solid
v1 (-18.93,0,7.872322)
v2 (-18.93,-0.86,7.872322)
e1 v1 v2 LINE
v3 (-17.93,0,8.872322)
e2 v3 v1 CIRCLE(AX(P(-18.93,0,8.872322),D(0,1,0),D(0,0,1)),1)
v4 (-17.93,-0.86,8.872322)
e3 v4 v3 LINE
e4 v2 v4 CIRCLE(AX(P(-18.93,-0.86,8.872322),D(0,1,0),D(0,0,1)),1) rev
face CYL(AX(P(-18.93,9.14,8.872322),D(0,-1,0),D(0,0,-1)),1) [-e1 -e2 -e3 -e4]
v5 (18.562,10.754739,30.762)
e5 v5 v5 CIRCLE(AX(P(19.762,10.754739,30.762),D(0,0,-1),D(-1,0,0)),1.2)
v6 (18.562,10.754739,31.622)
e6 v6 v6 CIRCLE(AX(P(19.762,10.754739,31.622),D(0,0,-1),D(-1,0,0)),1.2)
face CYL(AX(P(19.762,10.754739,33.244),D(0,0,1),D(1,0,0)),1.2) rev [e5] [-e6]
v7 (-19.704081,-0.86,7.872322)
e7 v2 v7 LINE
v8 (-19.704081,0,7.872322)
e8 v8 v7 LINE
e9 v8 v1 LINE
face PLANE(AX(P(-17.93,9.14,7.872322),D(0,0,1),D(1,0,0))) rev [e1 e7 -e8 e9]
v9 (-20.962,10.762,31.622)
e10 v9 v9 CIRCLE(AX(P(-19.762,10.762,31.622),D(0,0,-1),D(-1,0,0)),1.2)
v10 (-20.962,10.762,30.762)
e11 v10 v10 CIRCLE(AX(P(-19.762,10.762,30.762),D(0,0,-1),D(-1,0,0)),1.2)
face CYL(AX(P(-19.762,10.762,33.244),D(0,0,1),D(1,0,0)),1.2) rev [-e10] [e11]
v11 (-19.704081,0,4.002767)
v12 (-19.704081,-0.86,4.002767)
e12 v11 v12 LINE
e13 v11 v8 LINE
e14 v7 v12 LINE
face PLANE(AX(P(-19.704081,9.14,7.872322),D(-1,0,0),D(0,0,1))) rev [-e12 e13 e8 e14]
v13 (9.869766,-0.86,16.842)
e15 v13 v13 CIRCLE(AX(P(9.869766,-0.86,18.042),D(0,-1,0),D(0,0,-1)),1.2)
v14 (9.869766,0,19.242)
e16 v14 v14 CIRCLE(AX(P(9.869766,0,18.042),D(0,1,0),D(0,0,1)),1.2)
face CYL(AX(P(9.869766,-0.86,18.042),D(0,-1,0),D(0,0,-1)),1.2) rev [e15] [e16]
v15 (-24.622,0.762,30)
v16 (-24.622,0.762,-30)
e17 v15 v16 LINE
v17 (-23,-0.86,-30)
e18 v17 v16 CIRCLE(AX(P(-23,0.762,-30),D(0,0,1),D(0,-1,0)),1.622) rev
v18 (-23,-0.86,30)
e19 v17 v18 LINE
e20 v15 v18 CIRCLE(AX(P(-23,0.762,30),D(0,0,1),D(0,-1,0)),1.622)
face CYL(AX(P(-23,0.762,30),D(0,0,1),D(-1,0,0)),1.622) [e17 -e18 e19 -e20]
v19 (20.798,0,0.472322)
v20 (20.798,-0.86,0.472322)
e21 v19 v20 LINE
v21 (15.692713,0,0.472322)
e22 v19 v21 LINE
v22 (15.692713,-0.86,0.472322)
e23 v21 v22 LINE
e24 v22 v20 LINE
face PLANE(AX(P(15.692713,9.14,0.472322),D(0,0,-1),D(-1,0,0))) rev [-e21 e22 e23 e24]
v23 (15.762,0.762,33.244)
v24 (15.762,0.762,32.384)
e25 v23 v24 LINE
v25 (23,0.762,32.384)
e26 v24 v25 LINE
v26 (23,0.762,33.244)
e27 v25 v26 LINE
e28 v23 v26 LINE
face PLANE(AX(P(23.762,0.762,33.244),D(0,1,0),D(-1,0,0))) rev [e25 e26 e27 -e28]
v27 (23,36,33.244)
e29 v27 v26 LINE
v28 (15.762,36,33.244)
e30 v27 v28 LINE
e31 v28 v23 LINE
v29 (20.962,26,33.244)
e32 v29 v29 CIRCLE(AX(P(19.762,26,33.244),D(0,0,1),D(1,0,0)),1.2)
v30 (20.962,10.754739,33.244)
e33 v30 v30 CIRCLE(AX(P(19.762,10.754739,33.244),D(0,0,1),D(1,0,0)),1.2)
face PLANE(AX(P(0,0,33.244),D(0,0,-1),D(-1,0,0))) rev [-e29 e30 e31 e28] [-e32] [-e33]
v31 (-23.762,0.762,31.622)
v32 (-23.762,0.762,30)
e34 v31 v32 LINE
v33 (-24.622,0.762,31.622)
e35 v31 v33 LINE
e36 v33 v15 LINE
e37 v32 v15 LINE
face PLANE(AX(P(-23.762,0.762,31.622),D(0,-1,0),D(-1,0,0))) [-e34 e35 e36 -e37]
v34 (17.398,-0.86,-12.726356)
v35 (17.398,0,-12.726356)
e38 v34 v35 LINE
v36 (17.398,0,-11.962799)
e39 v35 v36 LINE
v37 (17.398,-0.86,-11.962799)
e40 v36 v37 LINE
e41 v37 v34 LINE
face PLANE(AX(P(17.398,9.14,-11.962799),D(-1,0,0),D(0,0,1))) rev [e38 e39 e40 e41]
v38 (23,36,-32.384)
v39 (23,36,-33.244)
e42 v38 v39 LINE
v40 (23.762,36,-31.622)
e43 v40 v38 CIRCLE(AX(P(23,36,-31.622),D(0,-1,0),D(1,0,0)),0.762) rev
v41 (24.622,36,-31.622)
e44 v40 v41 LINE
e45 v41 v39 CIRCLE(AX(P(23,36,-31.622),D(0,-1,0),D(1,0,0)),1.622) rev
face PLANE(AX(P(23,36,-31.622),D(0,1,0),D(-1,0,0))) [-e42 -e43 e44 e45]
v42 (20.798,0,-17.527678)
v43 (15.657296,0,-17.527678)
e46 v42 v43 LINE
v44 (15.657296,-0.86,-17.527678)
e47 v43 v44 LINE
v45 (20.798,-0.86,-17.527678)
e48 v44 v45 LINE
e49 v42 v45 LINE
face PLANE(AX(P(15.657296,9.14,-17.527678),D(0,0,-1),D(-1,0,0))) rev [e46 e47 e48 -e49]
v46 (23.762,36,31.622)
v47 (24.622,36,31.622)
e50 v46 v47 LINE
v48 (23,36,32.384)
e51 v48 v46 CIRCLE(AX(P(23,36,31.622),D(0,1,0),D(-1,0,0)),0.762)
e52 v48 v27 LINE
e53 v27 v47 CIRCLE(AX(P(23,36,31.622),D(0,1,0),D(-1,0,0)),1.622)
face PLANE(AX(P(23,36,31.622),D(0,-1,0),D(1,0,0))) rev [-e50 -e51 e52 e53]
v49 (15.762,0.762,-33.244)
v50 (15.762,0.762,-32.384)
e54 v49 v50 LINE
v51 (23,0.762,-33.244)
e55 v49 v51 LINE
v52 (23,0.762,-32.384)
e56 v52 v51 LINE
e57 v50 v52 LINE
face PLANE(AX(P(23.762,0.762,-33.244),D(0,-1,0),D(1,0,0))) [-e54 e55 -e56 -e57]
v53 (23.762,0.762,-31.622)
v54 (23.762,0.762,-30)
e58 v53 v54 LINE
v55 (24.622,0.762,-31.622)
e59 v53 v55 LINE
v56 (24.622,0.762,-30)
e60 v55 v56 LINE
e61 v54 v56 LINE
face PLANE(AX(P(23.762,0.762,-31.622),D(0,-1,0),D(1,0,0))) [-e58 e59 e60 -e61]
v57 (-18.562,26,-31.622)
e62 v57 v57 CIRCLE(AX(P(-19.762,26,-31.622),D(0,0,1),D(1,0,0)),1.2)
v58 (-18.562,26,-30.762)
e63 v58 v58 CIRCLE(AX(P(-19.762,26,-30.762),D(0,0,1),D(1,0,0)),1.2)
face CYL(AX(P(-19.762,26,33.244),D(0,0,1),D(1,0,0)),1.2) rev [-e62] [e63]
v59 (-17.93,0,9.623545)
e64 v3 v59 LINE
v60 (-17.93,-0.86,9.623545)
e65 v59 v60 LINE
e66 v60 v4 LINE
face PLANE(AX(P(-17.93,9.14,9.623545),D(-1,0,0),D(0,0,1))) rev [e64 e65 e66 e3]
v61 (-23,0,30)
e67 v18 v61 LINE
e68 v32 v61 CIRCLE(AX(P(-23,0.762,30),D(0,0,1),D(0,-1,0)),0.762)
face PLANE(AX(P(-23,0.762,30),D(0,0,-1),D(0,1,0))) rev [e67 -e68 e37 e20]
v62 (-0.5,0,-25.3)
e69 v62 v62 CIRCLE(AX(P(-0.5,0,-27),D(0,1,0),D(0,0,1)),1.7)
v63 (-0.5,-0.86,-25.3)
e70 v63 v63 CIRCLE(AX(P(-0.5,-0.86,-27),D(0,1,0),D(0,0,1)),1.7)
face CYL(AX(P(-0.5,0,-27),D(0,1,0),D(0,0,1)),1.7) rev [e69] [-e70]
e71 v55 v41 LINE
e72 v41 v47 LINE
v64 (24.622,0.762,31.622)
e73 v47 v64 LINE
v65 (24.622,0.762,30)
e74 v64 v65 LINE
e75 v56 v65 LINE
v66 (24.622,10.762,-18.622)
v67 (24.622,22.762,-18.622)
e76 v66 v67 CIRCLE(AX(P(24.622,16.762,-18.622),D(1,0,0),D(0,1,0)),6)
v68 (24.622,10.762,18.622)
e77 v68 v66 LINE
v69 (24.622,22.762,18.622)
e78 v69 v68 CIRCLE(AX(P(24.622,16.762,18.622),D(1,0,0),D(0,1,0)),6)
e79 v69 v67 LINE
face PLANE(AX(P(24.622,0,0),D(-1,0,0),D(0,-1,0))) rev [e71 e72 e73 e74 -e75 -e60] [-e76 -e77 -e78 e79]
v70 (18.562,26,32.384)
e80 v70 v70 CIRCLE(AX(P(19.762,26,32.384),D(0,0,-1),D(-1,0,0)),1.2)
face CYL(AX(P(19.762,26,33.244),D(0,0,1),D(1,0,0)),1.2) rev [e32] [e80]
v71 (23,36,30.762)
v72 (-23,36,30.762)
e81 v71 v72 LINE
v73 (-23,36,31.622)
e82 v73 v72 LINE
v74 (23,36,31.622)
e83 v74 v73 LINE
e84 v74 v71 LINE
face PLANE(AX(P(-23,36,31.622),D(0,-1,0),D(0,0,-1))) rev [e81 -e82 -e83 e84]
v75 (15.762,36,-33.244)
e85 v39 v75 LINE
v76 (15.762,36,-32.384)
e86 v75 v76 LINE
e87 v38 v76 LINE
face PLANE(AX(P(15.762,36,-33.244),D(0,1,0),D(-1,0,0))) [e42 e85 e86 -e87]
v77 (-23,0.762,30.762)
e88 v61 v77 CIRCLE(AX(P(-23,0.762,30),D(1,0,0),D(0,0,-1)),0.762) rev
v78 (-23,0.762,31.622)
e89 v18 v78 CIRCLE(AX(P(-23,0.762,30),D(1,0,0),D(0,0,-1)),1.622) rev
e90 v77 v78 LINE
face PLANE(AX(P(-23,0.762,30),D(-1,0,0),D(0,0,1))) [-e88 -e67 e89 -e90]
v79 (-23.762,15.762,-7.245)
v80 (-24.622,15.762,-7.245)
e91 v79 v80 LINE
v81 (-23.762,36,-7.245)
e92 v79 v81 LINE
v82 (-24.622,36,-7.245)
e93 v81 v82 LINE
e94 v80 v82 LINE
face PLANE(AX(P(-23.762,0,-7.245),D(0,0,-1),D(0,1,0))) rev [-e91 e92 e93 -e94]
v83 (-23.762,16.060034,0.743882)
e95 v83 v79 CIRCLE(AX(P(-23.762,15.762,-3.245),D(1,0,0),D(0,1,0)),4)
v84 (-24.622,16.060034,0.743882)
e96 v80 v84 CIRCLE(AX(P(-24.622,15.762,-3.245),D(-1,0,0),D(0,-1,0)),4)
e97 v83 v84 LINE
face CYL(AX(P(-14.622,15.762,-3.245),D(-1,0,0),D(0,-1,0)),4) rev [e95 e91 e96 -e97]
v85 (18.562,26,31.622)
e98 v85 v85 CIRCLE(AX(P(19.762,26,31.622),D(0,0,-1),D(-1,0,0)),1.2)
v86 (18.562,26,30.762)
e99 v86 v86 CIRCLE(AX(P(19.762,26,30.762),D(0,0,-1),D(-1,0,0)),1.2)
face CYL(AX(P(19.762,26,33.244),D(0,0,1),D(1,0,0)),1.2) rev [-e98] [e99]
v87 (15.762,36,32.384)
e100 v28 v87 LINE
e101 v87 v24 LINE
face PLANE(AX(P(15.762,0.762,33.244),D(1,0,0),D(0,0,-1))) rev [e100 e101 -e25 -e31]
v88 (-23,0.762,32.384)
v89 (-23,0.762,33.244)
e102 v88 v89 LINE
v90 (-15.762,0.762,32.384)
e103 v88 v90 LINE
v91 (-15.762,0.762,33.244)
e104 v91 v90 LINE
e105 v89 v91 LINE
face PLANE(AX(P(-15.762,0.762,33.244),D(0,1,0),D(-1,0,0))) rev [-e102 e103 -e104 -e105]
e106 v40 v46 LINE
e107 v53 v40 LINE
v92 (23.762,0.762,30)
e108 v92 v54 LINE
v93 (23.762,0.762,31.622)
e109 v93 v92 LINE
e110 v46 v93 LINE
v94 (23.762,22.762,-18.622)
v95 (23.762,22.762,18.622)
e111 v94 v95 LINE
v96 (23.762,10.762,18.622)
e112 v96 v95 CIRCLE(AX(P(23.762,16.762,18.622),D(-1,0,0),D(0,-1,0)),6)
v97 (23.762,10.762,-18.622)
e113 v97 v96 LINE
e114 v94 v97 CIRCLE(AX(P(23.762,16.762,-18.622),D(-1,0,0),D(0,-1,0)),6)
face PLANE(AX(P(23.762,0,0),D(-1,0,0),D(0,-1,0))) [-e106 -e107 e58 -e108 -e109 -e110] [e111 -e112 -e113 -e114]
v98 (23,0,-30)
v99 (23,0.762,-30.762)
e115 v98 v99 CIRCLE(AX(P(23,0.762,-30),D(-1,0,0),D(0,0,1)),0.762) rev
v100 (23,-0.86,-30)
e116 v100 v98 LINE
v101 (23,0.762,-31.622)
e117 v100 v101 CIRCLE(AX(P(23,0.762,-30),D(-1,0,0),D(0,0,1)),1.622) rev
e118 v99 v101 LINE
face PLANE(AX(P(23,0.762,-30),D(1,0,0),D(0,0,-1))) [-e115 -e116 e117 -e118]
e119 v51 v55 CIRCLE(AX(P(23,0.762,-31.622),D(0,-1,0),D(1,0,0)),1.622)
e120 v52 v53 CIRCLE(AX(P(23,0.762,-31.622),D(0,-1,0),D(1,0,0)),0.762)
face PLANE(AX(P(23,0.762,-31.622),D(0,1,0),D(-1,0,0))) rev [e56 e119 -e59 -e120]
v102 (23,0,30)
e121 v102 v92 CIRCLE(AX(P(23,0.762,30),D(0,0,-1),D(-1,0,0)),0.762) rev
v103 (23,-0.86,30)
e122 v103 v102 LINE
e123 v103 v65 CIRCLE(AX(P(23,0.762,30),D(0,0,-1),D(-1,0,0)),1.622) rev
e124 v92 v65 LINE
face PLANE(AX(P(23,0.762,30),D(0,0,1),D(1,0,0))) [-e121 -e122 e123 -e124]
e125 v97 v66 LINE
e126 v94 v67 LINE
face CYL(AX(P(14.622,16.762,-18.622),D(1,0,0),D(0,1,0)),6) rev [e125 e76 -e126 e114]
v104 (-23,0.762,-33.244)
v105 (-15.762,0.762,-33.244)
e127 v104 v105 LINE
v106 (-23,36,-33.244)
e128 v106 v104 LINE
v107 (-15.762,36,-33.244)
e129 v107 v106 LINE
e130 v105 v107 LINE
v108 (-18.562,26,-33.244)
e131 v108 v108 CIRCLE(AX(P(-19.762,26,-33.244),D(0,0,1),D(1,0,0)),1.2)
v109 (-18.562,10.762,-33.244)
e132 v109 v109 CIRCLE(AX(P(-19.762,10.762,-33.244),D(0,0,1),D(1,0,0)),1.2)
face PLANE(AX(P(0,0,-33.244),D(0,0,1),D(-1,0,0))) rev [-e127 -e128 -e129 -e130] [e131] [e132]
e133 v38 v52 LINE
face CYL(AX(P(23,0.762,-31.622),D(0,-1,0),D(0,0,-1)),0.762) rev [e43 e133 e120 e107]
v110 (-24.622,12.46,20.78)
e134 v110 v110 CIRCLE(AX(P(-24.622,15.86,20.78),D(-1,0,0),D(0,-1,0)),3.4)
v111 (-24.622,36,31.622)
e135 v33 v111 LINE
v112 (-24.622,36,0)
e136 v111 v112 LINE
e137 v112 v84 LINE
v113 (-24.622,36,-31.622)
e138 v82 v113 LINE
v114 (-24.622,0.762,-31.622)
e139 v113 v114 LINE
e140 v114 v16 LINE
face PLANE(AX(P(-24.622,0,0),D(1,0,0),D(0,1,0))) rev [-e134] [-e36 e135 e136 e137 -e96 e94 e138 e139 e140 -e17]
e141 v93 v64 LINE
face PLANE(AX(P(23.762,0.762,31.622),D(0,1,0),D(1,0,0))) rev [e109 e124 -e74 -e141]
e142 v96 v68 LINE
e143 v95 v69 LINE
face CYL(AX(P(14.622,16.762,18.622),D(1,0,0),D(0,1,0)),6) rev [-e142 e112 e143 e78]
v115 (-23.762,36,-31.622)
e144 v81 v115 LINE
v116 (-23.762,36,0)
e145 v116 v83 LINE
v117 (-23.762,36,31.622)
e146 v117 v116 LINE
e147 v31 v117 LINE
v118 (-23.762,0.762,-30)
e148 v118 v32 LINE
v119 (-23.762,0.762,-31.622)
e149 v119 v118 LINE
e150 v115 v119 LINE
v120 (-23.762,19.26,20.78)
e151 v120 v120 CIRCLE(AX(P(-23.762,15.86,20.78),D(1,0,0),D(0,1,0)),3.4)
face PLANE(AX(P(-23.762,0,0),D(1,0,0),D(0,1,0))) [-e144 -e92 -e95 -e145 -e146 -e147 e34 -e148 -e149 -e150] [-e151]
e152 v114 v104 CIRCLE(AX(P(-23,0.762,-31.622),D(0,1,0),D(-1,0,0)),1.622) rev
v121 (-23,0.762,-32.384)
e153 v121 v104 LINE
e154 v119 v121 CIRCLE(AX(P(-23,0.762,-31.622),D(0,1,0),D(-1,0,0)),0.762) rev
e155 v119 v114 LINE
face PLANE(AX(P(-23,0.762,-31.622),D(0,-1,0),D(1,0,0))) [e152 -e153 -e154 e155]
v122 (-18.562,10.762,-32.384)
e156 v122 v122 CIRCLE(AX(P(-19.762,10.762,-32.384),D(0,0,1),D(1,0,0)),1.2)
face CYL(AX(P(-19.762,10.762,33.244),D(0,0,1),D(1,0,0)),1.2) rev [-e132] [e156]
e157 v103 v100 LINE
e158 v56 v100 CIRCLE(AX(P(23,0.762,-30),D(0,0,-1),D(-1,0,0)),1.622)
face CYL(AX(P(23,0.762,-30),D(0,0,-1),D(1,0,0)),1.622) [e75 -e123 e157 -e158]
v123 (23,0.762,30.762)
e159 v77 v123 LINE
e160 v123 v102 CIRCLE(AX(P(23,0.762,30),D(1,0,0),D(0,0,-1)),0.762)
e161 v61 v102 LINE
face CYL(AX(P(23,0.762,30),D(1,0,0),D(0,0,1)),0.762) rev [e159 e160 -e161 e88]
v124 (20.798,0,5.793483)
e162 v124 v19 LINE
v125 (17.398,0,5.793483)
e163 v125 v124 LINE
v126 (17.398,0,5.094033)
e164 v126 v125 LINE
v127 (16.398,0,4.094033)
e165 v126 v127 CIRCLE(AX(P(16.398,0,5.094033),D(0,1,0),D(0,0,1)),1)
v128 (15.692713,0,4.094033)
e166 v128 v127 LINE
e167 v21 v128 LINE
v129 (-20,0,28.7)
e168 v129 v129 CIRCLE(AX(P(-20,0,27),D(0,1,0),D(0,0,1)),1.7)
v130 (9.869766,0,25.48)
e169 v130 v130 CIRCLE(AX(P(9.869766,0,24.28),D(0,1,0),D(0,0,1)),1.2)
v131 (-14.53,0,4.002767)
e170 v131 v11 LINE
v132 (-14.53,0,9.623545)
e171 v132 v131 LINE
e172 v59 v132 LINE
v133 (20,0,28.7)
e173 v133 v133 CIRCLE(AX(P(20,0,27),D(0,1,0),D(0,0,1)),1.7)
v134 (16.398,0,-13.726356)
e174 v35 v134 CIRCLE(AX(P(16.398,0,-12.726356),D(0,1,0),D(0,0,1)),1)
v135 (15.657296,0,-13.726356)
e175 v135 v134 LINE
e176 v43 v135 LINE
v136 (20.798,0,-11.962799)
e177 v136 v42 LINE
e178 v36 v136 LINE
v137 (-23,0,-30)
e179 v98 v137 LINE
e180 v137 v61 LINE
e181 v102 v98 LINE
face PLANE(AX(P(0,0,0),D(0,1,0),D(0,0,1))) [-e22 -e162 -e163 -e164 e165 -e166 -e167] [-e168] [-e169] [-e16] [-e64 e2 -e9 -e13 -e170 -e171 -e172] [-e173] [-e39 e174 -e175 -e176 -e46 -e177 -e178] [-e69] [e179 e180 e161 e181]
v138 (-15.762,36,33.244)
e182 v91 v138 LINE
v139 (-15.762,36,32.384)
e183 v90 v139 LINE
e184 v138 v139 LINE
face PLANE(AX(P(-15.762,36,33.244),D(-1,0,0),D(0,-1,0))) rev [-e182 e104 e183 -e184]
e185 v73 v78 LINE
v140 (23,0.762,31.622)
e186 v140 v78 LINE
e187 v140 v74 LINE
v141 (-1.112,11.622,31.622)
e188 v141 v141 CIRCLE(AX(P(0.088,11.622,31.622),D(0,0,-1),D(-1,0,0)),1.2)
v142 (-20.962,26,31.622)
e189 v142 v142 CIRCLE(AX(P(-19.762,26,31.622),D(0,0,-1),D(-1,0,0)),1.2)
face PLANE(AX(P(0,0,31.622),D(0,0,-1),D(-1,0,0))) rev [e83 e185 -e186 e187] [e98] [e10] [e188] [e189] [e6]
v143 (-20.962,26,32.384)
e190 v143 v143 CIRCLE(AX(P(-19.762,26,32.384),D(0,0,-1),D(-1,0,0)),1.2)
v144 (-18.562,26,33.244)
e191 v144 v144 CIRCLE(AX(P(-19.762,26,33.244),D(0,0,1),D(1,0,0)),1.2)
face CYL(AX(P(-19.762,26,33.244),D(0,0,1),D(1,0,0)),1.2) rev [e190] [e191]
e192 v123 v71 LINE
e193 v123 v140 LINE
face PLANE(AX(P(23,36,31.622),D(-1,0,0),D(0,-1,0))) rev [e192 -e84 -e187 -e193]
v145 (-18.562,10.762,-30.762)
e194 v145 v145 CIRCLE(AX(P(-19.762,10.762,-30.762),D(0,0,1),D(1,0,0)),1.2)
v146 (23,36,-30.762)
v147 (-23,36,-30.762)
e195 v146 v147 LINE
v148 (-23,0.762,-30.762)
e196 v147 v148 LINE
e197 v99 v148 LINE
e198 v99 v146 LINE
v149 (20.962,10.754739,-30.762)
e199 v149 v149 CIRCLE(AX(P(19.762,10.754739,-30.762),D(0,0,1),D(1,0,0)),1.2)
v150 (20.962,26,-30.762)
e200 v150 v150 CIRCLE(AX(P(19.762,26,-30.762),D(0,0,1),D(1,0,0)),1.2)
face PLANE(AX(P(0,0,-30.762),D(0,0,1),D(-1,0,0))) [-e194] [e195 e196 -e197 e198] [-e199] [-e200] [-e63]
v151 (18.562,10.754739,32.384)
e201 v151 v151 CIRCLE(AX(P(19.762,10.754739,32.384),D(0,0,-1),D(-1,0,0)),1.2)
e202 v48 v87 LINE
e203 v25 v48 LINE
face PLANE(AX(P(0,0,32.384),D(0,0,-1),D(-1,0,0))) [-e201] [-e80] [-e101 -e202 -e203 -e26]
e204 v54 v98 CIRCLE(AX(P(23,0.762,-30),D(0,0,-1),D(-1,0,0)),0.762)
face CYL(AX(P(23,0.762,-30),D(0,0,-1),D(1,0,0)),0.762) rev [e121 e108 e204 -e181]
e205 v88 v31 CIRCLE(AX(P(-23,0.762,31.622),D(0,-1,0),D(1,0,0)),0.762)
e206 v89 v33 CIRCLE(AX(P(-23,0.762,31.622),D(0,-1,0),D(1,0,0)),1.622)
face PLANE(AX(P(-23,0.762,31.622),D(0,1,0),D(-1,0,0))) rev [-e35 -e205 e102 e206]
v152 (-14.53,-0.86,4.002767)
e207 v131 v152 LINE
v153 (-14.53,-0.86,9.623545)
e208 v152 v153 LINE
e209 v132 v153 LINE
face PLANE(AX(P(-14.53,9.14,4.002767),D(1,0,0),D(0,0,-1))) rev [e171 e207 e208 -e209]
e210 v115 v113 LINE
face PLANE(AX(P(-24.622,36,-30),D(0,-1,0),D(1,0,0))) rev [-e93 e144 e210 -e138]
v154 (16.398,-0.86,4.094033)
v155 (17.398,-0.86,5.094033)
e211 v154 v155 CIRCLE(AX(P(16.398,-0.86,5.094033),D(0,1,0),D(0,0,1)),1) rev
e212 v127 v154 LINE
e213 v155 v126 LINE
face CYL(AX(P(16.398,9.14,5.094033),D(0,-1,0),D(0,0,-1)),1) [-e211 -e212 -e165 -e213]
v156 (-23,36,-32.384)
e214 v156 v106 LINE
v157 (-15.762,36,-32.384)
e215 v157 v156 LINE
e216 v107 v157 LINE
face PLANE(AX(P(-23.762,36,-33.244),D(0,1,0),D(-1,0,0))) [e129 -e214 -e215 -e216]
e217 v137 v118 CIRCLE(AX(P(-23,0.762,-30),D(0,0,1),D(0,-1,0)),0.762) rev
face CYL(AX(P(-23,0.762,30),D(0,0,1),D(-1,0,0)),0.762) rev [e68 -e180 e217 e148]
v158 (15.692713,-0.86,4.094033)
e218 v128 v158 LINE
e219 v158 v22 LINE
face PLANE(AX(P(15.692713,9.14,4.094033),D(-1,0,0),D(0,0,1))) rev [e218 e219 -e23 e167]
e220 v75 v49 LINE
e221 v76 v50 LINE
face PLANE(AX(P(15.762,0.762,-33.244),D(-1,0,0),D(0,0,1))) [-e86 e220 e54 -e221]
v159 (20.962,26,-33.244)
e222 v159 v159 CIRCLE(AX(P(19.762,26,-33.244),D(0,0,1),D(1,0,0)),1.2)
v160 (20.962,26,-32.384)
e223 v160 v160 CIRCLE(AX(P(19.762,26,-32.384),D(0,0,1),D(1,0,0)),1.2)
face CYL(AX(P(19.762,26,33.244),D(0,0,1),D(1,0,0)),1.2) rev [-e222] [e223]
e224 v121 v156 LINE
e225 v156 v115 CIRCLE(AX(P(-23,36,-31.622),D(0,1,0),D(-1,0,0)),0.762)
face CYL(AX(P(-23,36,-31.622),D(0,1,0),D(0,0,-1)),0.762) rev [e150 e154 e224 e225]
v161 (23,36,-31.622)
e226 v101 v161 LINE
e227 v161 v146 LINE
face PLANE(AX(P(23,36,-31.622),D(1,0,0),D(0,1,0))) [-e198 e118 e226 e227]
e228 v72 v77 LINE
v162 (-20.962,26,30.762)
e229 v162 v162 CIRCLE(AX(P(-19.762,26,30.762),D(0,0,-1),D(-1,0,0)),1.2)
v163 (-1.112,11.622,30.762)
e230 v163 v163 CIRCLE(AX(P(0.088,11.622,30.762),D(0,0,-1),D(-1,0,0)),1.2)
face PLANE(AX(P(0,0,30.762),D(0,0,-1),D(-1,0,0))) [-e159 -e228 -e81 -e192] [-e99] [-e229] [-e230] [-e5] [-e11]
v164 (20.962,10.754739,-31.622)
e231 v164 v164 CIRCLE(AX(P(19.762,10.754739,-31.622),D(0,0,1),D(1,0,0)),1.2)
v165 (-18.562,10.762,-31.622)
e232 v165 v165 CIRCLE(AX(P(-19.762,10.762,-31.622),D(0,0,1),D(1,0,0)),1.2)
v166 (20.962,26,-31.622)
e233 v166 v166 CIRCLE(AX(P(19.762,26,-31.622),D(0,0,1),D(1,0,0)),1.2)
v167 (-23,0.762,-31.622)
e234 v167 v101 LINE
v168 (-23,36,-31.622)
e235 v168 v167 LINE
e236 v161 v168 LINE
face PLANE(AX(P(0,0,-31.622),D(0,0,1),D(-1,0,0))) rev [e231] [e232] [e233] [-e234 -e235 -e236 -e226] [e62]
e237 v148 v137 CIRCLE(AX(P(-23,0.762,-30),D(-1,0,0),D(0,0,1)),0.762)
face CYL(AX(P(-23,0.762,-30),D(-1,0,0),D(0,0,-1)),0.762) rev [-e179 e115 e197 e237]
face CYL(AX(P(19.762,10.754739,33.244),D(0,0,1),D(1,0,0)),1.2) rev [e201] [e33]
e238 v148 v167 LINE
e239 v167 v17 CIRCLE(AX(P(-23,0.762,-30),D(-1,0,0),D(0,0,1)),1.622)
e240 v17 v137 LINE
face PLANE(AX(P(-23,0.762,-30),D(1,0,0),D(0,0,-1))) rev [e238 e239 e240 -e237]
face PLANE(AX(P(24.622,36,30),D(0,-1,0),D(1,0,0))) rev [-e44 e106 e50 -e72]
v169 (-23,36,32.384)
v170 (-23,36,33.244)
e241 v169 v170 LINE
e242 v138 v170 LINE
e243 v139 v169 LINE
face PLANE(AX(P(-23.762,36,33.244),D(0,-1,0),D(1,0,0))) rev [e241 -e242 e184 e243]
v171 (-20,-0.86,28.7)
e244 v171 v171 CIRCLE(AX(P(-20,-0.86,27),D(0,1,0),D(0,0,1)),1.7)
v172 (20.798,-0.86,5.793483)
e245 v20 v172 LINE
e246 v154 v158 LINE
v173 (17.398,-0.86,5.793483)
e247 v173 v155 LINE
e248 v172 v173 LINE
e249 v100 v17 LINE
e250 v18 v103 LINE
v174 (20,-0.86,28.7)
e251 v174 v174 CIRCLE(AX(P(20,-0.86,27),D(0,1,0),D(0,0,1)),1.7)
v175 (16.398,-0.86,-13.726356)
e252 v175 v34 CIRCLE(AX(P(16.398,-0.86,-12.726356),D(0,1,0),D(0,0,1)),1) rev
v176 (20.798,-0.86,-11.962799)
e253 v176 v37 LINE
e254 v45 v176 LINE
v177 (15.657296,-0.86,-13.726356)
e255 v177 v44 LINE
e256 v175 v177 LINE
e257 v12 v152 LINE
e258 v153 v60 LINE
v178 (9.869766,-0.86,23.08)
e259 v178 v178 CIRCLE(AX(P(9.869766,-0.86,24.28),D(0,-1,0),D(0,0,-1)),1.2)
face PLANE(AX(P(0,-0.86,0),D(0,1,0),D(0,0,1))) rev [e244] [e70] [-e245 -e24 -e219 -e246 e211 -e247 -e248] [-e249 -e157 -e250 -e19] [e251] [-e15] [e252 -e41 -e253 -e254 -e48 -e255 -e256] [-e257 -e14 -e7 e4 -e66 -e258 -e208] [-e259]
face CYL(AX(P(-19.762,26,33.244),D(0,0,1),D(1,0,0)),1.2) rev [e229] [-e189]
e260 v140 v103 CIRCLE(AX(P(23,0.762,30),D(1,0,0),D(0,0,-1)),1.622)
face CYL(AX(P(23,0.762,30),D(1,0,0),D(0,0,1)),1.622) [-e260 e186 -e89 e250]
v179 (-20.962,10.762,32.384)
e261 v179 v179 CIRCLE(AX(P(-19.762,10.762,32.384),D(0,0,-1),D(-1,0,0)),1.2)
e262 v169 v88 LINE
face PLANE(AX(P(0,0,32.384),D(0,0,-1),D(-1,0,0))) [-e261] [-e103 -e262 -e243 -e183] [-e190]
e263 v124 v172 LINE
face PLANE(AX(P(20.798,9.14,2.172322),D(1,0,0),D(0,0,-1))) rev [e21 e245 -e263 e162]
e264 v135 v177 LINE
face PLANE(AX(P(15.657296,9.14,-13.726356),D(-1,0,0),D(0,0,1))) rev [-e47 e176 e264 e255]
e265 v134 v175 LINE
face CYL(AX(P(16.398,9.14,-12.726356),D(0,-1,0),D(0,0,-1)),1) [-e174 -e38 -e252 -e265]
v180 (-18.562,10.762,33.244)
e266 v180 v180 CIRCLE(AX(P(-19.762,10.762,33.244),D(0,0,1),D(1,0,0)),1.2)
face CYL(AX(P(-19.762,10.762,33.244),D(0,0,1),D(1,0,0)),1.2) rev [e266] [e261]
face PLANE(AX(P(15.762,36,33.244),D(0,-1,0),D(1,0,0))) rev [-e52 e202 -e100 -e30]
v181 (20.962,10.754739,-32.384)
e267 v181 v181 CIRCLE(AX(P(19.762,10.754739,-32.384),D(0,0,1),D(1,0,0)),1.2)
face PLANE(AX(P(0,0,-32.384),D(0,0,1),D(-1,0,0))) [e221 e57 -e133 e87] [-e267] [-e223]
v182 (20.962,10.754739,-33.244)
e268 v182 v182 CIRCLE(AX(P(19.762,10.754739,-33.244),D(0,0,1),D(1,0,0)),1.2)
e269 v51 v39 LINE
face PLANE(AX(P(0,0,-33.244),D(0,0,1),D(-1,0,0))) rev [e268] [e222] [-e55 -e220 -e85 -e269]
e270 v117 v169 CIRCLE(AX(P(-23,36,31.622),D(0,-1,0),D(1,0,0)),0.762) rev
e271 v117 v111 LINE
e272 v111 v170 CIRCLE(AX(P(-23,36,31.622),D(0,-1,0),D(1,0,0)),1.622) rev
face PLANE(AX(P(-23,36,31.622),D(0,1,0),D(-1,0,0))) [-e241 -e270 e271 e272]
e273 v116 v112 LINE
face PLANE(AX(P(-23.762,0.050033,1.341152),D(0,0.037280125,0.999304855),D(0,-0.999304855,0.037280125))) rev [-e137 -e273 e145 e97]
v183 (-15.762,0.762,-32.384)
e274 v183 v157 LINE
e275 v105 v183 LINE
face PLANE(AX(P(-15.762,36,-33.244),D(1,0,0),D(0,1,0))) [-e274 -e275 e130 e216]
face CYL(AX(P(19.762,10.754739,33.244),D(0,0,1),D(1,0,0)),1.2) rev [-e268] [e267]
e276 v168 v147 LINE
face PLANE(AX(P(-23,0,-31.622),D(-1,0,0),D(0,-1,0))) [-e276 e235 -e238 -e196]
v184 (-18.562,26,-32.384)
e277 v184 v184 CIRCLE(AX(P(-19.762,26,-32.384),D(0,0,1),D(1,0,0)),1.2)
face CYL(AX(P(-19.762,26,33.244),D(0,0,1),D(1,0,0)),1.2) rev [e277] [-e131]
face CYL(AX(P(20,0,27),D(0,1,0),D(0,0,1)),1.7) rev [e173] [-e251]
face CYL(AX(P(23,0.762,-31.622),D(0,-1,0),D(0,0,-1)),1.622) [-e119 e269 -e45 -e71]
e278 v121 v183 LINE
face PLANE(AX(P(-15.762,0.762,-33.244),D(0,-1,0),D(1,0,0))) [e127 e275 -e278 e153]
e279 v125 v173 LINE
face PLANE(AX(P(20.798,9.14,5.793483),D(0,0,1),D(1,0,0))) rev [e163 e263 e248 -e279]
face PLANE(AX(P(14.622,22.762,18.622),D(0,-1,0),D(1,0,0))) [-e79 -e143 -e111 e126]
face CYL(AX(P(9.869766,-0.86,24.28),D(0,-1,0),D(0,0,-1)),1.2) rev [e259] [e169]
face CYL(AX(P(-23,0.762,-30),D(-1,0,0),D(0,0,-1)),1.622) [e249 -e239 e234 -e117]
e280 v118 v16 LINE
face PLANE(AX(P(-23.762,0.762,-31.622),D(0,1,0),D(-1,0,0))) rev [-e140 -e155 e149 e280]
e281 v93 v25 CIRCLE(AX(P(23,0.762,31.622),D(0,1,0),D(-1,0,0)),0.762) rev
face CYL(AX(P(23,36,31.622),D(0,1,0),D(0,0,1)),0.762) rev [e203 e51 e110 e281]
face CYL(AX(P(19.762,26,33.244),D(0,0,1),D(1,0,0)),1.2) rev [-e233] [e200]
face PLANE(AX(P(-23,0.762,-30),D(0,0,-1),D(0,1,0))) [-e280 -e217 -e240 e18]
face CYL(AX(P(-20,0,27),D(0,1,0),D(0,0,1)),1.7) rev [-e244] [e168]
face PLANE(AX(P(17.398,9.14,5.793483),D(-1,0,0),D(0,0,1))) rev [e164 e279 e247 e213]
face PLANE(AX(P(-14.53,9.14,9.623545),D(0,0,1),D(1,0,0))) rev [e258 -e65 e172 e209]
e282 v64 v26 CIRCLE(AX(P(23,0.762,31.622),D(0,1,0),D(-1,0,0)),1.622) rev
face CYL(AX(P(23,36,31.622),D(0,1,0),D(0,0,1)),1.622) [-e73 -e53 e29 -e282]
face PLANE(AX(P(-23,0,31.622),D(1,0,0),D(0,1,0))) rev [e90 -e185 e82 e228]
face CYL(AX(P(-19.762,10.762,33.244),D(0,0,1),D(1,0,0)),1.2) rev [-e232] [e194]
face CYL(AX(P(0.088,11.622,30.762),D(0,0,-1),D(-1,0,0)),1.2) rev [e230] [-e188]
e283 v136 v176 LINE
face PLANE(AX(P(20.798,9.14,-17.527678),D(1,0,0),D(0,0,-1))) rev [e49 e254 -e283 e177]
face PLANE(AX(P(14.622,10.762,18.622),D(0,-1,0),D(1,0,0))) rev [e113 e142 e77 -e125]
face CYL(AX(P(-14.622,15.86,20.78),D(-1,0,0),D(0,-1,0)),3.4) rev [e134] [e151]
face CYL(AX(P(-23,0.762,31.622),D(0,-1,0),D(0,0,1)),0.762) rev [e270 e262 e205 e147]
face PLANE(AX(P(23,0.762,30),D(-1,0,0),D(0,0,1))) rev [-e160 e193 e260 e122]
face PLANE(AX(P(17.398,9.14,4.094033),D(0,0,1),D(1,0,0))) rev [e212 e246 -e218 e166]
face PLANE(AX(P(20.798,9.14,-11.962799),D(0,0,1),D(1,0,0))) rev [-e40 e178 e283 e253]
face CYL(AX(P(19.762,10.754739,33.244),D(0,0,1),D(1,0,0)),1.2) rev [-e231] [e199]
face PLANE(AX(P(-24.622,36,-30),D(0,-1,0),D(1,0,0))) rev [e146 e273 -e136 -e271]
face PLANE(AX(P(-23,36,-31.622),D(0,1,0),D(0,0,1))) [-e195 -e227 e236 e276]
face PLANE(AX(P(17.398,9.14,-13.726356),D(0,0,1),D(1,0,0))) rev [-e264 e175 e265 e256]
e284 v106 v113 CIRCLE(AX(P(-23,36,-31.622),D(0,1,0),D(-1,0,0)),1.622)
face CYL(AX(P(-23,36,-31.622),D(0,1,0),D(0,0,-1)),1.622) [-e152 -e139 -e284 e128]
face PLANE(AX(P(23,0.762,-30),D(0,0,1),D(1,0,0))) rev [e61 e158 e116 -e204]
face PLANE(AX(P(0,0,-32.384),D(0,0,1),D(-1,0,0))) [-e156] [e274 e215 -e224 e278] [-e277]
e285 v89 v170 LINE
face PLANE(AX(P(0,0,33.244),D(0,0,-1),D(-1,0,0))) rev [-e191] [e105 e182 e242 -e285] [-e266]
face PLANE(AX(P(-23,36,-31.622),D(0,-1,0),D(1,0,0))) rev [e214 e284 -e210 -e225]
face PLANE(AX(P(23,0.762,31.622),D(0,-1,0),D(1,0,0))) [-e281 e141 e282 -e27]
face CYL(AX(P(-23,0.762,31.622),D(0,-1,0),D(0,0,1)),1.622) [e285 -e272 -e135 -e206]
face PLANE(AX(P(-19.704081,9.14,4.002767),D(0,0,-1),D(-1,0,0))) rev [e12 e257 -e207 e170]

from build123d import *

# Parameters (mm, degrees)
SKETCH2_W                = 46
SKETCH2_H                = 60
BASE_FLANGE1_DEPTH       = 0.86
EDGE_FLANGE1_DEPTH       = 60
EDGE_FLANGE2_DEPTH       = 46
EDGE_FLANGE3_DEPTH       = 60
EDGE_FLANGE5_START       = 0.762
EDGE_FLANGE5_DEPTH       = 35.238
EDGE_FLANGE6_START       = 0.762
EDGE_FLANGE6_DEPTH       = 35.238
M3_CLEARANCE_HOLE1_D     = 3.4
M3_CLEARANCE_HOLE1_DEPTH = 12
M3_CLEARANCE_HOLE1_TIP   = 1.021463052
SKETCH28_R               = 3.4
CUT_EXTRUDE1_DEPTH       = 10
SKETCH29_R               = 4
CUT_EXTRUDE2_DEPTH       = 10
M2_CLEARANCE_HOLE1_D     = 2.4
M2_CLEARANCE_HOLE1_DEPTH = 12
M2_CLEARANCE_HOLE1_TIP   = 0.721032743
M3_CLEARANCE_HOLE2_D     = 3.4
M3_CLEARANCE_HOLE2_DEPTH = 12
M3_CLEARANCE_HOLE2_TIP   = 1.021463052
M2_CLEARANCE_HOLE2_D     = 2.4
M2_CLEARANCE_HOLE4_D     = 2.4
M2_CLEARANCE_HOLE4_DEPTH = 12
M2_CLEARANCE_HOLE4_TIP   = 0.721032743
CUT_EXTRUDE3_DEPTH       = 10
CUT_EXTRUDE4_DEPTH       = 10
CUT_EXTRUDE5_DEPTH       = 10
CUT_EXTRUDE6_DEPTH       = 10
FILLET1_R                = 1
CUT_EXTRUDE7_DEPTH       = 10


# Read off the part's stored shape, not the designer's step: Edge-Flange5, Edge-Flange6
# Sheet-metal steps are written as plain solids
with BuildPart() as part:
    # Sketch2 → Base-Flange1 (new body)
    with BuildSketch(Plane(origin=(0, 0, 0), x_dir=(1, 0, 0), z_dir=(0, 1, 0))):
        Rectangle(SKETCH2_W, SKETCH2_H)
    extrude(amount=-BASE_FLANGE1_DEPTH)

    # Edge-Flange1 section (across the edge) → Edge-Flange1 (add)
    with BuildSketch(Plane(origin=(-23.762, 0, -30), x_dir=(1, 0, 0), z_dir=(0, 0, 1))):
        with BuildLine():
            Line((-0.86, 0.762), (-0.86, 36))
            Line((-0.86, 36), (0, 36))
            Line((0, 36), (0, 0.762))
            ThreePointArc((0, 0.762), (0.223184633, 0.223184633), (0.762, 0))
            Line((0.762, 0), (0.762, -0.86))
            ThreePointArc((0.762, -0.86), (-0.384927199, -0.384927199), (-0.86, 0.762))
        make_face()
    extrude(amount=EDGE_FLANGE1_DEPTH)

    # Edge-Flange2 section (across the edge) → Edge-Flange2 (add)
    with BuildSketch(Plane(origin=(-23, 0, 30.762), x_dir=(0, 0, -1), z_dir=(1, 0, 0))):
        with BuildLine():
            Line((-0.86, 0.762), (-0.86, 36))
            Line((-0.86, 36), (0, 36))
            Line((0, 36), (0, 0.762))
            ThreePointArc((0, 0.762), (0.223184633, 0.223184633), (0.762, 0))
            Line((0.762, 0), (0.762, -0.86))
            ThreePointArc((0.762, -0.86), (-0.384927199, -0.384927199), (-0.86, 0.762))
        make_face()
    edge_flange2 = extrude(amount=EDGE_FLANGE2_DEPTH)

    # Mirror1: Edge-Flange2 across plane
    add(edge_flange2.mirror(Plane.XY))

    # Edge-Flange3 section (across the edge) → Edge-Flange3 (add)
    with BuildSketch(Plane(origin=(23.762, 0, 30), x_dir=(-1, 0, 0), z_dir=(0, 0, -1))):
        with BuildLine():
            Line((-0.86, 0.762), (-0.86, 36))
            Line((-0.86, 36), (0, 36))
            Line((0, 36), (0, 0.762))
            ThreePointArc((0, 0.762), (0.223184633, 0.223184633), (0.762, 0))
            Line((0.762, 0), (0.762, -0.86))
            ThreePointArc((0.762, -0.86), (-0.384927199, -0.384927199), (-0.86, 0.762))
        make_face()
    extrude(amount=EDGE_FLANGE3_DEPTH)

    # Edge-Flange5 outline → Edge-Flange5 (add)
    with BuildSketch(Plane(origin=(0, 0, 0), x_dir=(1, 0, 0), z_dir=(0, 1, 0)).offset(EDGE_FLANGE5_START)):
        with BuildLine():
            ThreePointArc((-24.622, -31.622), (-24.146927199, -32.768927199), (-23, -33.244))
            Line((-23, -33.244), (-15.762, -33.244))
            Line((-15.762, -33.244), (-15.762, -32.384))
            Line((-15.762, -32.384), (-23, -32.384))
            ThreePointArc((-23, -32.384), (-23.538815367, -32.160815367), (-23.762, -31.622))
            Line((-23.762, -31.622), (-23.762, -30))
            Line((-23.762, -30), (-24.622, -30))
            Line((-24.622, -30), (-24.622, -31.622))
        make_face()
    edge_flange5 = extrude(amount=EDGE_FLANGE5_DEPTH)

    # Mirror2: Edge-Flange5 across plane
    add(edge_flange5.mirror(Plane.XY))

    # Edge-Flange6 outline → Edge-Flange6 (add)
    with BuildSketch(Plane(origin=(0, 0, 0), x_dir=(1, 0, 0), z_dir=(0, 1, 0)).offset(EDGE_FLANGE6_START)):
        with BuildLine():
            Line((15.762, -33.244), (23, -33.244))
            ThreePointArc((23, -33.244), (24.146927199, -32.768927199), (24.622, -31.622))
            Line((24.622, -31.622), (24.622, -30))
            Line((24.622, -30), (23.762, -30))
            Line((23.762, -30), (23.762, -31.622))
            ThreePointArc((23.762, -31.622), (23.538815367, -32.160815367), (23, -32.384))
            Line((23, -32.384), (15.762, -32.384))
            Line((15.762, -32.384), (15.762, -33.244))
        make_face()
    edge_flange6 = extrude(amount=EDGE_FLANGE6_DEPTH)

    # Mirror3: Edge-Flange6 across plane
    add(edge_flange6.mirror(Plane.XY))

    # M3 Clearance Hole1
    with Locations(Plane(origin=(0, 0, 0), x_dir=(1, 0, 0), z_dir=(0, 1, 0))):
        with Locations((-20, -27), (20, -27), (-0.5, 27)):
            Hole(M3_CLEARANCE_HOLE1_D / 2, depth=M3_CLEARANCE_HOLE1_DEPTH)
            with Locations((0, 0, -(M3_CLEARANCE_HOLE1_DEPTH + M3_CLEARANCE_HOLE1_TIP / 2))):  # 118° drill point
                Cone(0, M3_CLEARANCE_HOLE1_D / 2, M3_CLEARANCE_HOLE1_TIP, mode=Mode.SUBTRACT)

    # Sketch28 → Cut-Extrude1 (cut)
    with BuildSketch(Plane.ZY.offset(24.622)):
        with Locations(Location((20.78, 15.86, 0), (0, 0, 270))):
            Circle(SKETCH28_R)
    extrude(amount=-CUT_EXTRUDE1_DEPTH, mode=Mode.SUBTRACT)

    # Sketch29 → Cut-Extrude2 (cut)
    with BuildSketch(Plane.ZY.offset(24.622)):
        with Locations(Location((-3.245, 15.762, 0), (0, 0, 270))):
            Circle(SKETCH29_R)
    extrude(amount=-CUT_EXTRUDE2_DEPTH, mode=Mode.SUBTRACT)

    # M2 Clearance Hole1
    with Locations(Plane(origin=(0, -0.86, 0), x_dir=(-1, 0, 0), z_dir=(0, -1, 0))):
        with Locations((-9.869765706, -24.28), (-9.869765706, -18.042)):
            Hole(M2_CLEARANCE_HOLE1_D / 2, depth=M2_CLEARANCE_HOLE1_DEPTH)
            with Locations((0, 0, -(M2_CLEARANCE_HOLE1_DEPTH + M2_CLEARANCE_HOLE1_TIP / 2))):  # 118° drill point
                Cone(0, M2_CLEARANCE_HOLE1_D / 2, M2_CLEARANCE_HOLE1_TIP, mode=Mode.SUBTRACT)

    # M3 Clearance Hole2
    with Locations(Plane(origin=(0, -0.86, 0), x_dir=(-1, 0, 0), z_dir=(0, -1, 0))):
        with Locations((16.23, -6.172321578), (-19.098, -2.172321578), (-19.098, 15.827678422)):
            Hole(M3_CLEARANCE_HOLE2_D / 2, depth=M3_CLEARANCE_HOLE2_DEPTH)
            with Locations((0, 0, -(M3_CLEARANCE_HOLE2_DEPTH + M3_CLEARANCE_HOLE2_TIP / 2))):  # 118° drill point
                Cone(0, M3_CLEARANCE_HOLE2_D / 2, M3_CLEARANCE_HOLE2_TIP, mode=Mode.SUBTRACT)

    # M2 Clearance Hole2 (through all)
    with Locations(Plane.XY.offset(33.244)):
        with Locations((-19.762, 26), (-19.762, 10.762), (19.762, 26), (19.762, 10.754739314)):
            Hole(M2_CLEARANCE_HOLE2_D / 2)

    # M2 Clearance Hole4
    with Locations(Plane(origin=(0, 0, 30.762), x_dir=(-1, 0, 0), z_dir=(0, 0, -1))):
        with Locations((-0.088, 11.622)):
            Hole(M2_CLEARANCE_HOLE4_D / 2, depth=M2_CLEARANCE_HOLE4_DEPTH)
            with Locations((0, 0, -(M2_CLEARANCE_HOLE4_DEPTH + M2_CLEARANCE_HOLE4_TIP / 2))):  # 118° drill point
                Cone(0, M2_CLEARANCE_HOLE4_D / 2, M2_CLEARANCE_HOLE4_TIP, mode=Mode.SUBTRACT)

    # Sketch40 → Cut-Extrude3 (cut)
    with BuildSketch(Plane(origin=(24.622, 0, 0), x_dir=(0, 0, -1), z_dir=(1, 0, 0))):
        with BuildLine():
            Line((-18.622, 22.762), (18.622, 22.762))
            ThreePointArc((18.622, 22.762), (24.622, 16.762), (18.622, 10.762))
            Line((18.622, 10.762), (-18.622, 10.762))
            ThreePointArc((-18.622, 10.762), (-24.622, 16.762), (-18.622, 22.762))
        make_face()
    extrude(amount=-CUT_EXTRUDE3_DEPTH, mode=Mode.SUBTRACT)

    # Sketch42 → Cut-Extrude4 (cut)
    with BuildSketch(Plane(origin=(0, -0.86, 0), x_dir=(-1, 0, 0), z_dir=(0, -1, 0))):
        Polygon((14.53, -6.172321578), (14.53, -9.623545208), (17.93, -9.623545208), (17.93, -7.872321578), (19.704080783, -7.872321578), (19.704080783, -4.002766759), (14.53, -4.002766759), align=None)
    extrude(amount=-CUT_EXTRUDE4_DEPTH, mode=Mode.SUBTRACT)

    # Sketch41 → Cut-Extrude5 (cut)
    with BuildSketch(Plane.XZ.offset(0.86)):
        Polygon((20.798, 2.172321578), (20.798, 5.793483038), (17.398, 5.793483038), (17.398, 4.094032768), (15.692713332, 4.094032768), (15.692713332, 0.472321578), (20.798, 0.472321578), align=None)
    extrude(amount=-CUT_EXTRUDE5_DEPTH, mode=Mode.SUBTRACT)

    # Sketch43 → Cut-Extrude6 (cut)
    with BuildSketch(Plane(origin=(0, -0.86, 0), x_dir=(-1, 0, 0), z_dir=(0, -1, 0))):
        Polygon((-20.798, 15.827678422), (-20.798, 11.962799488), (-17.398, 11.962799488), (-17.398, 13.726356469), (-15.657296152, 13.726356469), (-15.657296152, 17.527678422), (-20.798, 17.527678422), align=None)
    extrude(amount=-CUT_EXTRUDE6_DEPTH, mode=Mode.SUBTRACT)

    # Fillet1
    fillet1_edges = [part.edges().sort_by_distance(p)[0] for p in [
        (-17.93, -0.43, 7.872321578),
        (17.398, -0.43, 4.094032768),
        (17.398, -0.43, -13.726356469),
    ]]
    fillet(fillet1_edges, radius=FILLET1_R)

    # Sketch44 → Cut-Extrude7 (cut)
    with BuildSketch(Plane.ZY.offset(24.622)):
        Polygon((0.755, 15.762), (0, 36), (-7.245, 36), (-7.245, 15.762), align=None)
    extrude(amount=-CUT_EXTRUDE7_DEPTH, mode=Mode.SUBTRACT)


solid = part.part
